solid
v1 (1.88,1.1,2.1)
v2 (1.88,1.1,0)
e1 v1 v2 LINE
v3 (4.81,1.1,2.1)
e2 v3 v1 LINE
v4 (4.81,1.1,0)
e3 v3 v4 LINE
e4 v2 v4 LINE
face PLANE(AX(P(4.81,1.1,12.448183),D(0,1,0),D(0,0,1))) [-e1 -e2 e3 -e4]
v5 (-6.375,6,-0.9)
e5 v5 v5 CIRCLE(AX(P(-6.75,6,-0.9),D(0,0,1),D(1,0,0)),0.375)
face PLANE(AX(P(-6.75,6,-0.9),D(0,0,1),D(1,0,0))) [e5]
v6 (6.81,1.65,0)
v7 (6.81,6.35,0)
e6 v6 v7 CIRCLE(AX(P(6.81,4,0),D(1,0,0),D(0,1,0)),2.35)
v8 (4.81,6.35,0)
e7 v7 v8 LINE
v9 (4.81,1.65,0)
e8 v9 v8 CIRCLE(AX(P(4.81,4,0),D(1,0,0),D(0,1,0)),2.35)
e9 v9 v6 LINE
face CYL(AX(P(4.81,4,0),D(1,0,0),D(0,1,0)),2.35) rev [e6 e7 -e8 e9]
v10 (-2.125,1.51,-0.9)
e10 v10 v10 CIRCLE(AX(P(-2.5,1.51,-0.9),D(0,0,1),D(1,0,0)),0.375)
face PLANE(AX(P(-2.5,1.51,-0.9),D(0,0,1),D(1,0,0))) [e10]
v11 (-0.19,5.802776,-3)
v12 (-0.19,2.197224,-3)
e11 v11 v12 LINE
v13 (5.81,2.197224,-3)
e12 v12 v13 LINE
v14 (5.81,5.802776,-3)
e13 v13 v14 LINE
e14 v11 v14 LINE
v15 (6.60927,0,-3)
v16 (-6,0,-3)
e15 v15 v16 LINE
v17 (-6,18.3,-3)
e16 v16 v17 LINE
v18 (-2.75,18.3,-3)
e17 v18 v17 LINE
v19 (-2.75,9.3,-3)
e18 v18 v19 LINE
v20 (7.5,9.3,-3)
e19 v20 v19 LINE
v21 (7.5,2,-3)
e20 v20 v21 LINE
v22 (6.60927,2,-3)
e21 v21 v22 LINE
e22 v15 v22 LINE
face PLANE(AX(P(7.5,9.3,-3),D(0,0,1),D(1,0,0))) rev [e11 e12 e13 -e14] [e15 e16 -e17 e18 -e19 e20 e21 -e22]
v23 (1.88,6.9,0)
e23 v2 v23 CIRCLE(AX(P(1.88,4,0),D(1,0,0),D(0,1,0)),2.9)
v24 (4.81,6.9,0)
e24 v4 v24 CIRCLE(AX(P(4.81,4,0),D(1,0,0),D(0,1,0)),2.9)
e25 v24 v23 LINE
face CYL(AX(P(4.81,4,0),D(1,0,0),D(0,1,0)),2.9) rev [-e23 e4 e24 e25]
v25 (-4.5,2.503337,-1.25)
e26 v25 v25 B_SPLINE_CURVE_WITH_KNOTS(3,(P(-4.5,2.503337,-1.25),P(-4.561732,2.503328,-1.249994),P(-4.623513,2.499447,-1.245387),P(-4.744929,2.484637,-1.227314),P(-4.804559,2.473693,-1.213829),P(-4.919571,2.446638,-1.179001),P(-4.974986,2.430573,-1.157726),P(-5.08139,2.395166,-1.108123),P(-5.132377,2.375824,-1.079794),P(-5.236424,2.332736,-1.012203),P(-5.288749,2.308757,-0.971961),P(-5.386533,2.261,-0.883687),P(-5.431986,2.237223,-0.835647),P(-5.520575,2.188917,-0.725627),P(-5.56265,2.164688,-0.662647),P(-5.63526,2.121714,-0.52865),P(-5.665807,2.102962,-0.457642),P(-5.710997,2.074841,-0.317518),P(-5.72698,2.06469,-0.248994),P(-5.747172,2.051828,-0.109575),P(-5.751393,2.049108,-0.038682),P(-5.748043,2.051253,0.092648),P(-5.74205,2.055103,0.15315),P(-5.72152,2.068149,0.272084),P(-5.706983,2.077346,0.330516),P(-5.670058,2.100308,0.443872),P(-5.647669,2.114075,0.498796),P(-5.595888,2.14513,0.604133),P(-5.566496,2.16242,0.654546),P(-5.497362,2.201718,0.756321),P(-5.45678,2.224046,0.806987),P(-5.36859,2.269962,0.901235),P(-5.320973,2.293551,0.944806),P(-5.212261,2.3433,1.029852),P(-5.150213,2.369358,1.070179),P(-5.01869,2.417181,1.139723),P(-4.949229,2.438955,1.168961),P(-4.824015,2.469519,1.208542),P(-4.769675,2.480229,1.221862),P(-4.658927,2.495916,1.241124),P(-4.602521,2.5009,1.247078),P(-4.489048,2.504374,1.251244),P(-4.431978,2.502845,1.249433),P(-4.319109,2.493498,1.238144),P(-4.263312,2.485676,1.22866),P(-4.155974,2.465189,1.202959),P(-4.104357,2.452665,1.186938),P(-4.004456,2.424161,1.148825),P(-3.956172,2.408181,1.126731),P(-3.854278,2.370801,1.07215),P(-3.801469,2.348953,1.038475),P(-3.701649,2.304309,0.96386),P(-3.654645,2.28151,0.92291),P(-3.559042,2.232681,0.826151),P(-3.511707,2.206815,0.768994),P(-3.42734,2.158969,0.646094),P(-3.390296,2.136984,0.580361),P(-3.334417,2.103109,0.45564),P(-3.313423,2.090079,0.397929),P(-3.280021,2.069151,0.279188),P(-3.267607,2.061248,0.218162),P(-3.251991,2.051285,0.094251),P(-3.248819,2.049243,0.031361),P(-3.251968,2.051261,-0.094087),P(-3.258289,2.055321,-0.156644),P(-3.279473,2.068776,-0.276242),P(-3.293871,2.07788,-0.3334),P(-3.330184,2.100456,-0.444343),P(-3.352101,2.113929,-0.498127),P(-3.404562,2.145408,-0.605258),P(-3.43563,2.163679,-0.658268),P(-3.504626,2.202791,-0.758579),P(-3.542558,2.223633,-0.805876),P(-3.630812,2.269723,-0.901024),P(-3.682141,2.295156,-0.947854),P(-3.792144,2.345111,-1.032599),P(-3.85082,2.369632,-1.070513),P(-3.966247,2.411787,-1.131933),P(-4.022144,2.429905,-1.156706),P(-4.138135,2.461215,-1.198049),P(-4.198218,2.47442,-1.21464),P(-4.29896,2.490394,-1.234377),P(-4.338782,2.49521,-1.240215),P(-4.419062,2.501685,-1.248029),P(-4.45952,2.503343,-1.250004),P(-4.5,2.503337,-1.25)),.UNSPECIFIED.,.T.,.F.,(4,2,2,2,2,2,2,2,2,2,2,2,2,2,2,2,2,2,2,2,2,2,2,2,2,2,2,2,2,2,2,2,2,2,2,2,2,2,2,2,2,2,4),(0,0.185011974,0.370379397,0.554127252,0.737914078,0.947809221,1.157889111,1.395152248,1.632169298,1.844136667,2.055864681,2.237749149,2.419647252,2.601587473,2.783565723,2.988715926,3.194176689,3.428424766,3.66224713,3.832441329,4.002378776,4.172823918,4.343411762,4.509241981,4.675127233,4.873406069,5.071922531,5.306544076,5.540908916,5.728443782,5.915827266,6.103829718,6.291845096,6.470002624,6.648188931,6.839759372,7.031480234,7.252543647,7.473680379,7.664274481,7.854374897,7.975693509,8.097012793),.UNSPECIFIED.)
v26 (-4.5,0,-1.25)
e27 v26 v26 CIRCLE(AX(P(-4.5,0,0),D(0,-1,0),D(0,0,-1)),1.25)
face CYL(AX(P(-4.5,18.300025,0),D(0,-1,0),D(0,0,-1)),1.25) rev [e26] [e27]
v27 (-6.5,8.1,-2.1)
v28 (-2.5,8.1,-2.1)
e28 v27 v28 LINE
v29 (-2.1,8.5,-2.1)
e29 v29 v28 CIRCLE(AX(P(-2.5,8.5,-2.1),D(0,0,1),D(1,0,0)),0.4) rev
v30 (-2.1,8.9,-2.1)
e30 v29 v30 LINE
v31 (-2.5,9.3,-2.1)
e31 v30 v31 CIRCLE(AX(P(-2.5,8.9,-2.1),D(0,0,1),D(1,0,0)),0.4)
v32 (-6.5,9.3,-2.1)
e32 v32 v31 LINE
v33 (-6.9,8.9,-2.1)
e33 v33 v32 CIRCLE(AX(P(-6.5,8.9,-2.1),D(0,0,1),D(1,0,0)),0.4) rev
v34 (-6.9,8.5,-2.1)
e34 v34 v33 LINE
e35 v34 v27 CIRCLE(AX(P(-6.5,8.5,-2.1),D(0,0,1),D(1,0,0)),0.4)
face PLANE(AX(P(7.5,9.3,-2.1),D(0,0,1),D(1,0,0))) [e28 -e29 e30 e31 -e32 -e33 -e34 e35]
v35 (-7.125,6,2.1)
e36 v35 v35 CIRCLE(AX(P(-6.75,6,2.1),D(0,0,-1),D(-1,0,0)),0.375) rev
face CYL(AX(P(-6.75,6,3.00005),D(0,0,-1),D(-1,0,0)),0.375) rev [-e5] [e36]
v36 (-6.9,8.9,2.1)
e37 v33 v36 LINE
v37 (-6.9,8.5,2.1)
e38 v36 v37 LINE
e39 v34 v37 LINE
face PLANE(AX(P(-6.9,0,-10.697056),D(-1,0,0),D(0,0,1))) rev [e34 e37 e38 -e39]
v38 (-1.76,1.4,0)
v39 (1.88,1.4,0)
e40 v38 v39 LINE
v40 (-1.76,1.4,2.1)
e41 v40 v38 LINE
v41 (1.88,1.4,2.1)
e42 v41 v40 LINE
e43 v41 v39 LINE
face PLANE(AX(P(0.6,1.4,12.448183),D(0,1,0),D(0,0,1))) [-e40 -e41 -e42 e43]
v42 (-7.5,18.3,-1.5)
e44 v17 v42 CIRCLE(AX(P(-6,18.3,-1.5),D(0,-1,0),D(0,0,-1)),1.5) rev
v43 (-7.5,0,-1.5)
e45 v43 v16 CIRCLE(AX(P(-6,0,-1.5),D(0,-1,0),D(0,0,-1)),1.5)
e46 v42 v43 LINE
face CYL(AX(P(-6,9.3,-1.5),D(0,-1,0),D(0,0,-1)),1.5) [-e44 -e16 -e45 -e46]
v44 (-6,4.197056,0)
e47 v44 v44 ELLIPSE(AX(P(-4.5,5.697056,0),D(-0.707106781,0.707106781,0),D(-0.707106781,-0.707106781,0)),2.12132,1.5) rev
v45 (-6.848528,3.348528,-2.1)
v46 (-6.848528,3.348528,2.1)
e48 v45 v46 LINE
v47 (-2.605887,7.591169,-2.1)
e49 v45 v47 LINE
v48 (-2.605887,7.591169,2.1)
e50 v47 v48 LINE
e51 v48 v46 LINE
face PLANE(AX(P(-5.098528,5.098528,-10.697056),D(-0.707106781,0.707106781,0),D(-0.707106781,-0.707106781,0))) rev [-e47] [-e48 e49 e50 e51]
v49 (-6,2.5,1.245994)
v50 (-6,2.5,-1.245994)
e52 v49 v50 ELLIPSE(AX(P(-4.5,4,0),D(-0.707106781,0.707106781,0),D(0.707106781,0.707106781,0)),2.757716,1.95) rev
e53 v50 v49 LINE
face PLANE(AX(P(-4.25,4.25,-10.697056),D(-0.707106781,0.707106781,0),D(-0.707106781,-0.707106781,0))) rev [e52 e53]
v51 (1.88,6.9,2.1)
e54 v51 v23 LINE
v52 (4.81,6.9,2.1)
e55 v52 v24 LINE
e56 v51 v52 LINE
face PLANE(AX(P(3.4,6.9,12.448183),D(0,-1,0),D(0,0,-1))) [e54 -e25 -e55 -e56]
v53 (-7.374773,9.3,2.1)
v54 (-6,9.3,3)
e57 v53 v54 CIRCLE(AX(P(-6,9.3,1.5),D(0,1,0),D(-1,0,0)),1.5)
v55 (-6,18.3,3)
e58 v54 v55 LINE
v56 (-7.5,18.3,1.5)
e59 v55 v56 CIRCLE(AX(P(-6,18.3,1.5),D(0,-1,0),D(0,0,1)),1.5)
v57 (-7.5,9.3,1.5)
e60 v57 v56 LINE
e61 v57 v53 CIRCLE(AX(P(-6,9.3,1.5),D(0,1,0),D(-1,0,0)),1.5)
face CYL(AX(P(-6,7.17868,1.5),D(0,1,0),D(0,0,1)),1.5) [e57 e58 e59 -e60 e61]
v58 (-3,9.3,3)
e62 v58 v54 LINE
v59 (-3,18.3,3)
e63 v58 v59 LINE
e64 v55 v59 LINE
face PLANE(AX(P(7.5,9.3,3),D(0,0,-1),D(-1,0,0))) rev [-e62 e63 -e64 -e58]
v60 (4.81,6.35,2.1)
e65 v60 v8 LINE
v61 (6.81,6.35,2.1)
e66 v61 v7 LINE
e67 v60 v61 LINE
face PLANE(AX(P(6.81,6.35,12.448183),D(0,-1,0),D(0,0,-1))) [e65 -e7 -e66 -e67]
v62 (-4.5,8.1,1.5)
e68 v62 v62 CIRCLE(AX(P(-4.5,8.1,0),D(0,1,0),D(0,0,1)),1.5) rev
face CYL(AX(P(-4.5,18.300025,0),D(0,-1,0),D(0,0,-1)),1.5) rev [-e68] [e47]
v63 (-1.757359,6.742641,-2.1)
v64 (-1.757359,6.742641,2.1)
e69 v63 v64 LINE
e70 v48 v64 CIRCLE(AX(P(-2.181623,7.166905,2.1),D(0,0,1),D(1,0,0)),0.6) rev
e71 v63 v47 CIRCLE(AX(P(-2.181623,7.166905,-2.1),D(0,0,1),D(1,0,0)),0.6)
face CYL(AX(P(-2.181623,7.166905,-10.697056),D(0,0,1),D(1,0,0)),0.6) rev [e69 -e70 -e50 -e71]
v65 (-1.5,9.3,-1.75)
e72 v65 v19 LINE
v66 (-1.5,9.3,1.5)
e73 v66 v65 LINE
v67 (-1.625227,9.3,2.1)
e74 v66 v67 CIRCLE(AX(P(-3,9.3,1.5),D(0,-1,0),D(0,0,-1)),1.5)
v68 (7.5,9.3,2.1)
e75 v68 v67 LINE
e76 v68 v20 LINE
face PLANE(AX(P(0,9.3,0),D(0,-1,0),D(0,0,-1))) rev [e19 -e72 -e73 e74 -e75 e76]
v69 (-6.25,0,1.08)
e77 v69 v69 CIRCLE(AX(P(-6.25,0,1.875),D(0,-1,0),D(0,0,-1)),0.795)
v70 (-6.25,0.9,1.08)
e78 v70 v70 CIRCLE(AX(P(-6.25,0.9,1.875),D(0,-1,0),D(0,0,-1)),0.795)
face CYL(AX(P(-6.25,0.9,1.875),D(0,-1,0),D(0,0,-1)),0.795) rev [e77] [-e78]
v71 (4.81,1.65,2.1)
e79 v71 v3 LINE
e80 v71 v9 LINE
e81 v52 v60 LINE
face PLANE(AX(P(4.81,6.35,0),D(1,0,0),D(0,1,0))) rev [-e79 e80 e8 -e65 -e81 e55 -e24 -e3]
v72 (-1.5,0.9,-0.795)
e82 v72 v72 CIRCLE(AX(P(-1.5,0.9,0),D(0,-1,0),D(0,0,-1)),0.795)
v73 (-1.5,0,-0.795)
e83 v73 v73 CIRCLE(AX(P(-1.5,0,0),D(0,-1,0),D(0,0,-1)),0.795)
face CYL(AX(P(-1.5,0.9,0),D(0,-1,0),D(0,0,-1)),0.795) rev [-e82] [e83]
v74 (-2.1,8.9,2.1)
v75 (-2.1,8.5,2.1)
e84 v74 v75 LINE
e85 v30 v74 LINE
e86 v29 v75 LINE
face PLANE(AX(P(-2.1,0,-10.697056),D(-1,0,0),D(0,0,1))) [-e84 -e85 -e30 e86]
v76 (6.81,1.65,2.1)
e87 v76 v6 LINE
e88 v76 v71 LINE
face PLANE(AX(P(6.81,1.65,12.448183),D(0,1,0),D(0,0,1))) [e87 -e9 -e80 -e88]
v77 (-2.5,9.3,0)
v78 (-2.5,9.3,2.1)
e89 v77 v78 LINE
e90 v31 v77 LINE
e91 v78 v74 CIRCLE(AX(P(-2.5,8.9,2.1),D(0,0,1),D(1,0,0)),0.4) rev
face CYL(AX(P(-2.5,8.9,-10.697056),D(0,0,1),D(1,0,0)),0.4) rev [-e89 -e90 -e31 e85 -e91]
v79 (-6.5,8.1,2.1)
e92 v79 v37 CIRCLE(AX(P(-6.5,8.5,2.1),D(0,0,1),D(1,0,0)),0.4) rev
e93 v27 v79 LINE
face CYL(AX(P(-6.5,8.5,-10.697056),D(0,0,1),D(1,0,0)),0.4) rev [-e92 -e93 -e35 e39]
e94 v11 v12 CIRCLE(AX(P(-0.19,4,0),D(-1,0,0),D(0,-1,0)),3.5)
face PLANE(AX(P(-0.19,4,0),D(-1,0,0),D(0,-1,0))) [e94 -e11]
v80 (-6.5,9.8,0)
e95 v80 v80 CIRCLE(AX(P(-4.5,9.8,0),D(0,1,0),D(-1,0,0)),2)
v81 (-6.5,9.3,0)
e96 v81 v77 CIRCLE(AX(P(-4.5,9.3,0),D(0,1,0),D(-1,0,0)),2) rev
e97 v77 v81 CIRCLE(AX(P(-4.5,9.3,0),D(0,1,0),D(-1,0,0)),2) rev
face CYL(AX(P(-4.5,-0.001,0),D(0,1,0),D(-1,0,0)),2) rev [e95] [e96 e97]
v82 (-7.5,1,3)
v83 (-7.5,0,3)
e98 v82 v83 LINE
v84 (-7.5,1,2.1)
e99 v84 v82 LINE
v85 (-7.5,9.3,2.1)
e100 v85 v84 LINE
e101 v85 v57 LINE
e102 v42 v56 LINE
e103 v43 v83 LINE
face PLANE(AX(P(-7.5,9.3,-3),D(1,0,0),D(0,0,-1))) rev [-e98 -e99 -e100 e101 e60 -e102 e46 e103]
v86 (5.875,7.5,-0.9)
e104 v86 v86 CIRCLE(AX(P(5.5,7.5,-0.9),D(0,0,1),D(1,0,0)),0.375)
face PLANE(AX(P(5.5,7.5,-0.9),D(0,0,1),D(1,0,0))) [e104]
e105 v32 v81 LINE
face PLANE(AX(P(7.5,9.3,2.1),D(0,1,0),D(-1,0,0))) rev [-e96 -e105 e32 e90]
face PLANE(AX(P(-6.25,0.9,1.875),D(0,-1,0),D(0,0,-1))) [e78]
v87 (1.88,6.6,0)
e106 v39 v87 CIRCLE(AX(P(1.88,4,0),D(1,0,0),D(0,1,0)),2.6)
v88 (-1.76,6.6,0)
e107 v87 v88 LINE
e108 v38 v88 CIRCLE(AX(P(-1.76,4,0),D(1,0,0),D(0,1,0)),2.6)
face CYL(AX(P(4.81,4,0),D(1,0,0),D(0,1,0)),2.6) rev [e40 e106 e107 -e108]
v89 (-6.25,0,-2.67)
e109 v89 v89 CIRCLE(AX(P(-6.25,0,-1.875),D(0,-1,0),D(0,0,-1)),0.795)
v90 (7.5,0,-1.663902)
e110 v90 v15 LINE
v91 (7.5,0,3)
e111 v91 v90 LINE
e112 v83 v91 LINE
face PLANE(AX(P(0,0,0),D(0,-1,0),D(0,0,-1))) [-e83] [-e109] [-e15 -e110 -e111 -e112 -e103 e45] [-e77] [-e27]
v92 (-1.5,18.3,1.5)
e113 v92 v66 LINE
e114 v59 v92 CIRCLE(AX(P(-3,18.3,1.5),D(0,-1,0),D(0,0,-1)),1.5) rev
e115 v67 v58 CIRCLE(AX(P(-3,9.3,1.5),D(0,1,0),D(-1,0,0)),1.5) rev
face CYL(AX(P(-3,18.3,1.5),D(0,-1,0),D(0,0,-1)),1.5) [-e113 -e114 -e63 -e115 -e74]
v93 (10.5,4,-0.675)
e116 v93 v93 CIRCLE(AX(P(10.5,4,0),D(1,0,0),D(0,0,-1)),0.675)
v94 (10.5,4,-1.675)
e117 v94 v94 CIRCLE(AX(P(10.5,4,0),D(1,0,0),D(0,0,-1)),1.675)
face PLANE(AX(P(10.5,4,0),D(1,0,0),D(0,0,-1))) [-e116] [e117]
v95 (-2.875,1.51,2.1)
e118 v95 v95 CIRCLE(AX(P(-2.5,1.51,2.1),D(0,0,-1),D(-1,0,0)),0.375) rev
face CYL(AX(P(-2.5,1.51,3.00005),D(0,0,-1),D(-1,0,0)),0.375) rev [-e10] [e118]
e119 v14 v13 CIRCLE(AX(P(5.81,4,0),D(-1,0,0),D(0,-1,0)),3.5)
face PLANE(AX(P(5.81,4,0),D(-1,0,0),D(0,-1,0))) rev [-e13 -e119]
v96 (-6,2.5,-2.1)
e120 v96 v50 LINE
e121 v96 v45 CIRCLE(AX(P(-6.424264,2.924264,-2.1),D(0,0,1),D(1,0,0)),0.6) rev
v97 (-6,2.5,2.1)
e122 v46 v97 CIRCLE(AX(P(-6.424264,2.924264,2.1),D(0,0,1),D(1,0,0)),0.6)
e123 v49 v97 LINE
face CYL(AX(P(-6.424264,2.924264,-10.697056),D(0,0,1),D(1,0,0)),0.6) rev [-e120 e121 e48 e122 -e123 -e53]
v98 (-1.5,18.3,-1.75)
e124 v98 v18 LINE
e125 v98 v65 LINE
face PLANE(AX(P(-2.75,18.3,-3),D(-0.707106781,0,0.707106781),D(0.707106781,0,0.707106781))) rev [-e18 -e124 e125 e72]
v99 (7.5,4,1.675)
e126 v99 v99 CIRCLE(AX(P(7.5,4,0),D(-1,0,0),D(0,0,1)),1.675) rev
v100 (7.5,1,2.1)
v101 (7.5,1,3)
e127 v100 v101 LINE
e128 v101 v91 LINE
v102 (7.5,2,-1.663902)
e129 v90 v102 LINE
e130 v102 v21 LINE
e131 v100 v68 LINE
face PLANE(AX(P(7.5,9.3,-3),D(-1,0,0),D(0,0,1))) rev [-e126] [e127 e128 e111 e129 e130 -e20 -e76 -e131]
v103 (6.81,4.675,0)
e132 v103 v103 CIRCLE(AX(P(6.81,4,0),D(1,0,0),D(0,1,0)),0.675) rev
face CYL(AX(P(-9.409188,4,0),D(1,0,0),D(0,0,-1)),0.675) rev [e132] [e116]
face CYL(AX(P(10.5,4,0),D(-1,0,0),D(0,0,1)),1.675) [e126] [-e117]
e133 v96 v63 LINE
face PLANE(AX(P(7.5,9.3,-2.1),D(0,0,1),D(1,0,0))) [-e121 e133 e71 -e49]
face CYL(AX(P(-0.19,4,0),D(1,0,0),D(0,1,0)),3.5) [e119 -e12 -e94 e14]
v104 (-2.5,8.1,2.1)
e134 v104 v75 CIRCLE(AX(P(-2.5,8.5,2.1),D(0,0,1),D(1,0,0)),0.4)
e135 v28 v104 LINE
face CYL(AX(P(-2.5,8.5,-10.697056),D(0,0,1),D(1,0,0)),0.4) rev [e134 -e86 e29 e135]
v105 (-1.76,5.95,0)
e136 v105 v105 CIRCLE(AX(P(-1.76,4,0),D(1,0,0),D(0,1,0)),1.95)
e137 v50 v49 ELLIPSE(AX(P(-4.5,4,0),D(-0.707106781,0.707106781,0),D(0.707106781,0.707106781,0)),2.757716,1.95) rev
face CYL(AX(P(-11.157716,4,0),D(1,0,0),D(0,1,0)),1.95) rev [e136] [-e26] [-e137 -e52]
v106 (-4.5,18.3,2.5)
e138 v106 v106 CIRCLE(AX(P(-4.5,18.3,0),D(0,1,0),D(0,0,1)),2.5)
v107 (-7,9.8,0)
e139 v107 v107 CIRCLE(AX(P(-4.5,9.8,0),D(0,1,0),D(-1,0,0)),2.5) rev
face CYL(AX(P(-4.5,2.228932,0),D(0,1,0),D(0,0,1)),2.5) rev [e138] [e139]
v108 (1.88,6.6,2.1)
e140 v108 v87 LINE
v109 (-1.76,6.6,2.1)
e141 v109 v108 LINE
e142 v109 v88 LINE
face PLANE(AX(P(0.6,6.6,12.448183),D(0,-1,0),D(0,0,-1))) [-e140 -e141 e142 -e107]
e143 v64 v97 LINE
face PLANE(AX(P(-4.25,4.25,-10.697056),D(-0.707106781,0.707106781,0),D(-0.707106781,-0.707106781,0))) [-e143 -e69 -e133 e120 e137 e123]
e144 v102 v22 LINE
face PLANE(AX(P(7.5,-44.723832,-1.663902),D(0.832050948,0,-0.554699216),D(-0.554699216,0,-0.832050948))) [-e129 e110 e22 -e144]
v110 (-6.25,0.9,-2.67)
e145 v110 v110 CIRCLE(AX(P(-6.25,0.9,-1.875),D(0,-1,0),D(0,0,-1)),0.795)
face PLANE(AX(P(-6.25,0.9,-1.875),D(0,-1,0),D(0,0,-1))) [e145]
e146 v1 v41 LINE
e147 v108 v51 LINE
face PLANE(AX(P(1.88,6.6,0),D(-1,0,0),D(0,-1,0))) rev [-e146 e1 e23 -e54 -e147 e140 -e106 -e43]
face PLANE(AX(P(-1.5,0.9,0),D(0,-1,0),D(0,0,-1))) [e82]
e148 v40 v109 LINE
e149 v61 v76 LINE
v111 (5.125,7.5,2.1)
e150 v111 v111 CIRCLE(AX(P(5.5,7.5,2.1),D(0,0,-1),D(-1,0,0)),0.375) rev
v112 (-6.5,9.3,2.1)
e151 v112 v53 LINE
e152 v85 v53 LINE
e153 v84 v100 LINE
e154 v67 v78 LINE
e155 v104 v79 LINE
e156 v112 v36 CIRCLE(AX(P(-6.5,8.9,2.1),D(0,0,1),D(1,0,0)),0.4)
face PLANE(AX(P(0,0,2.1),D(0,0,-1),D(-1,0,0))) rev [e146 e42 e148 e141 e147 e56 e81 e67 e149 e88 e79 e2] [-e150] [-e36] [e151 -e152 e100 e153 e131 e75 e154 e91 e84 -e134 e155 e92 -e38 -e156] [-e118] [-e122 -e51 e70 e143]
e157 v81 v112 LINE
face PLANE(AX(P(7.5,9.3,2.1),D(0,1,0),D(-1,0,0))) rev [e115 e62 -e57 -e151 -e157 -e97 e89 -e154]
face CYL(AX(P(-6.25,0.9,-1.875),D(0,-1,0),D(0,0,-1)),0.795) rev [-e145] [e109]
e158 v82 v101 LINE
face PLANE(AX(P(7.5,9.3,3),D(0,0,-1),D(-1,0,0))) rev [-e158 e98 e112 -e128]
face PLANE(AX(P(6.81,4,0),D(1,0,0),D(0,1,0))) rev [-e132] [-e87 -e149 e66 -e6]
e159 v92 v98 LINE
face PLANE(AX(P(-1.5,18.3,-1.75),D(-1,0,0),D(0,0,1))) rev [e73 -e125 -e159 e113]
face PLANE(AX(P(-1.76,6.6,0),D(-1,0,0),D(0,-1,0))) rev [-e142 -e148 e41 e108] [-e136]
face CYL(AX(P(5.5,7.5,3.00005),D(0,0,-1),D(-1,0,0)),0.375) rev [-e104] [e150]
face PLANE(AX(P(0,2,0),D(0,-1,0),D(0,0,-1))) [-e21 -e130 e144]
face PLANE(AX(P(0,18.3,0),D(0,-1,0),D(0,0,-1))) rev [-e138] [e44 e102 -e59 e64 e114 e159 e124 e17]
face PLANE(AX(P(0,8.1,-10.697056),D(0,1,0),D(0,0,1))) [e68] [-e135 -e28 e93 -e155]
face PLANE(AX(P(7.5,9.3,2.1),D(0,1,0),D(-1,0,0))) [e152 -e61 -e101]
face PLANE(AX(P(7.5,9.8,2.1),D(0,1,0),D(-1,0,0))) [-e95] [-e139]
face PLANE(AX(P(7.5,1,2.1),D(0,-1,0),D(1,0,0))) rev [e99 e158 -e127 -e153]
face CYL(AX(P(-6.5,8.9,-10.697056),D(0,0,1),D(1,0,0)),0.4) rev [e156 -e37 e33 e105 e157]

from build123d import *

# Parameters (mm, degrees)
SKETCH1_W                       = 15
SKETCH1_H                       = 6
MAIN_BODY_EXT_DEPTH             = 9.3
EMISSION_PATH_EXT_DEPTH         = 9
SKETCH3_R                       = 1.25
EMISSION_AND_GRIN_CUT_DEPTH     = 21.003499694
FIBER_FERRULE_CUT_REACH         = 25.851
FIBER_FERRULE_CUT_END_RADIUS    = 1.25
SKETCH4_R                       = 0.675
FIBER_START                     = 3
SKETCH41_R                      = 1.675
SKETCH41_R_2                    = 0.675
FIBER_FERRULE_PORT_EXT_DEPTH    = 3
SKETCH5_W                       = 15
SKETCH5_H                       = 8.3
FILTERSET_CUT1_DEPTH            = 0.9
FILTERSET_CUT2_DEPTH            = 4.2
SKETCH10_R                      = 2.5
EMISSION_LENS_CUT_DEPTH         = 8.5
EXCITATION_PATHWAY_CUT_REACH    = 24.231
SKETCH40_R                      = 1.95
EXCITATION_PATHWAY_CUT_2_DEPTH  = 2.1
SKETCH15_R                      = 0.795
MAGNETS_CUT_DEPTH               = 0.9
SCREW_HOLES_CUT_DEPTH           = 22.705989957
SCREW_HOLES_CUT_DEPTH_BACK      = 3
SKETCH18_R                      = 0.375
EXTERNAL_FILLET_1_R             = 1.5
EMISSION_PATHWAY_CUT_DEPTH      = 15.942891286
EMISSION_PATHWAY_CUT_DEPTH_BACK = 4
SKETCH28_R                      = 1.5
CUT_EXTRUDE16_DEPTH             = 9
CUT_EXTRUDE17_REACH             = 16.673
SKETCH37_R                      = 2
LENS_WALL_THICKNESS_EXT_DEPTH   = 6
BASEPLATE_NOTCH_CUT_DEPTH       = 22.386678096
BASEPLATE_NOTCH_CUT_DEPTH_BACK  = 2


with BuildPart() as part:
    # Sketch1 → Main Body Ext (new body)
    with BuildSketch(Plane(origin=(0, 0, 0), x_dir=(1, 0, 0), z_dir=(0, 1, 0))):
        Rectangle(SKETCH1_W, SKETCH1_H)
    extrude(amount=MAIN_BODY_EXT_DEPTH)

    # Sketch8 → Emission Path Ext (add)
    with BuildSketch(Plane(origin=(0, 9.3, 0), x_dir=(1, 0, 0), z_dir=(0, 1, 0))):
        Polygon((-2.75, 3), (-1.5, 1.75), (-1.5, -3), (-7.5, -3), (-7.5, 3), align=None)
    extrude(amount=EMISSION_PATH_EXT_DEPTH)

    # Sketch3 → Emission and Grin Cut (cut, through all)
    with BuildSketch(Plane.XZ):
        with Locations(Location((-4.5, 0, 0), (0, 0, 270))):
            Circle(SKETCH3_R)
    extrude(amount=-EMISSION_AND_GRIN_CUT_DEPTH, mode=Mode.SUBTRACT)

    # Fiber Ferrule Cut: up to this cylinder (the profile starts outside it)
    fiber_ferrule_cut_end = Plane(origin=(-4.5, 4, 0), z_dir=(0, -1, 0)) * Cylinder(FIBER_FERRULE_CUT_END_RADIUS, 55.202, mode=Mode.PRIVATE)
    # Sketch4 → Fiber Ferrule Cut (cut, up to the surface)
    with BuildSketch(Plane(origin=(7.5, 0, 0), x_dir=(0, 0, -1), z_dir=(1, 0, 0)), mode=Mode.PRIVATE) as fiber_ferrule_cut_sk1:
        with Locations((0, 4)):
            Circle(SKETCH4_R)
    fiber_ferrule_cut_tool1 = extrude(fiber_ferrule_cut_sk1.sketch, amount=-FIBER_FERRULE_CUT_REACH, mode=Mode.PRIVATE) - fiber_ferrule_cut_end
    add(fiber_ferrule_cut_tool1.solids().sort_by_distance((7.5, 4, 0))[0], mode=Mode.SUBTRACT)

    # Sketch41 → Fiber Ferrule Port Ext (add)
    with BuildSketch(Plane(origin=(7.5, 0, 0), x_dir=(0, 0, -1), z_dir=(1, 0, 0)).offset(FIBER_START)):
        with Locations(Location((0, 4, 0), (0, 0, 180))):
            Circle(SKETCH41_R)
        with Locations((0, 4)):
            Circle(SKETCH41_R_2, mode=Mode.SUBTRACT)
    extrude(amount=-FIBER_FERRULE_PORT_EXT_DEPTH)

    # Sketch5 → FilterSet Cut1 (cut)
    with BuildSketch(Plane.XY.offset(3)):
        with Locations((0, 5.15)):
            Rectangle(SKETCH5_W, SKETCH5_H)
    extrude(amount=-FILTERSET_CUT1_DEPTH, mode=Mode.SUBTRACT)

    # Sketch6 → FilterSet Cut2 (cut)
    with BuildSketch(Plane.XY.offset(2.1)):
        with BuildLine():
            Line((-2.60588745, 7.591168825), (-6.848528137, 3.348528137))
            ThreePointArc((-6.848528137, 3.348528137), (-6.848528137, 2.5), (-6, 2.5))
            Line((-6, 2.5), (-1.757359313, 6.742640687))
            ThreePointArc((-1.757359313, 6.742640687), (-1.757359313, 7.591168825), (-2.60588745, 7.591168825))
        make_face()
        with BuildLine():
            ThreePointArc((-6.5, 9.3), (-6.782842712, 9.182842712), (-6.9, 8.9))
            Line((-6.9, 8.9), (-6.9, 8.5))
            ThreePointArc((-6.9, 8.5), (-6.782842712, 8.217157288), (-6.5, 8.1))
            Line((-6.5, 8.1), (-2.5, 8.1))
            ThreePointArc((-2.5, 8.1), (-2.217157288, 8.217157288), (-2.1, 8.5))
            Line((-2.1, 8.5), (-2.1, 8.9))
            ThreePointArc((-2.1, 8.9), (-2.217157288, 9.182842712), (-2.5, 9.3))
            Line((-2.5, 9.3), (-6.5, 9.3))
        make_face()
    extrude(amount=-FILTERSET_CUT2_DEPTH, mode=Mode.SUBTRACT)

    # Sketch39 → Excitation Lens Cut (revolve, cut)
    with BuildSketch(Plane.XY, mode=Mode.PRIVATE) as excitation_lens_cut_sk:
        Polygon((0.6, 6.6), (1.88, 6.6), (1.88, 6.9), (3.4, 6.9), (4.81, 6.9), (4.81, 6.35), (6.81, 6.35), (6.81, 4), (4.81, 4), (3.4, 4), (-0.405829172, 4), (-0.9, 4), (-1.76, 4), (-1.76, 6.6), (-0.9, 6.6), align=None)
    revolve(excitation_lens_cut_sk.sketch.rotate(Axis((4.81, 4, 0), (-1, 0, 0)), 90), axis=Axis((4.81, 4, 0), (-1, 0, 0)), mode=Mode.SUBTRACT)

    # Sketch10 → Emission Lens Cut (cut)
    with BuildSketch(Plane(origin=(0, 18.3, 0), x_dir=(1, 0, 0), z_dir=(0, 1, 0))):
        with Locations(Location((-4.5, 0, 0), (0, 0, 270))):
            Circle(SKETCH10_R)
    extrude(amount=-EMISSION_LENS_CUT_DEPTH, mode=Mode.SUBTRACT)

    # Excitation Pathway Cut: up to this plane
    excitation_pathway_cut_end = Plane(origin=(-4.25, 4.25, -10.697056275), z_dir=(-0.7071067811865425, 0.7071067811865526, 0))
    # Sketch40 → Excitation Pathway Cut (cut, up to the surface)
    with BuildSketch(Plane(origin=(-1.76, 0, 0), x_dir=(0, 0, -1), z_dir=(1, 0, 0)), mode=Mode.PRIVATE) as excitation_pathway_cut_sk1:
        with Locations(Location((0, 4, 0), (0, 0, 90))):
            Circle(SKETCH40_R)
    excitation_pathway_cut_tool1 = split(extrude(excitation_pathway_cut_sk1.sketch, amount=-EXCITATION_PATHWAY_CUT_REACH, mode=Mode.PRIVATE), bisect_by=excitation_pathway_cut_end, keep=Keep.BOTH, mode=Mode.PRIVATE)
    add(excitation_pathway_cut_tool1.solids().sort_by_distance((-1.76, 4, 0))[0], mode=Mode.SUBTRACT)

    # Sketch44 → Excitation Pathway Cut 2 (cut)
    with BuildSketch(Plane.XY):
        Polygon((3.4, 1.1), (1.88, 1.1), (1.88, 1.4), (0.6, 1.4), (-0.9, 1.4), (-1.76, 1.4), (-1.76, 6.6), (-0.9, 6.6), (0.6, 6.6), (1.88, 6.6), (1.88, 6.9), (3.4, 6.9), (4.81, 6.9), (4.81, 6.35), (6.81, 6.35), (6.81, 1.65), (4.81, 1.65), (4.81, 1.1), align=None)
    extrude(amount=EXCITATION_PATHWAY_CUT_2_DEPTH, mode=Mode.SUBTRACT)

    # Sketch15 → Magnets Cut (cut)
    with BuildSketch(Plane.XZ):
        with Locations(Location((-6.25, -1.875, 0), (0, 0, 270))):
            Circle(SKETCH15_R)
        with Locations(Location((-6.25, 1.875, 0), (0, 0, 270))):
            Circle(SKETCH15_R)
        with Locations(Location((-1.5, 0, 0), (0, 0, 270))):
            Circle(SKETCH15_R)
    extrude(amount=-MAGNETS_CUT_DEPTH, mode=Mode.SUBTRACT)

    # Sketch18 → Screw Holes Cut (cut, two sides: drawn at the far end of the back side and taken through both)
    with BuildSketch(Plane.XY.offset(2.1).offset(-SCREW_HOLES_CUT_DEPTH_BACK)):
        with Locations(Location((-6.75, 6, 0), (0, 0, 180))):
            Circle(SKETCH18_R)
        with Locations(Location((5.5, 7.5, 0), (0, 0, 180))):
            Circle(SKETCH18_R)
        with Locations(Location((-2.5, 1.51, 0), (0, 0, 180))):
            Circle(SKETCH18_R)
    extrude(amount=SCREW_HOLES_CUT_DEPTH + SCREW_HOLES_CUT_DEPTH_BACK, mode=Mode.SUBTRACT)

    # External Fillet 1
    # the kernel refuses this fillet: 1.5 mm, written as the material it takes off along each edge
    with BuildSketch(Plane(origin=(-7.5, -3.75, -3), x_dir=(1, 0, 0), z_dir=(0, 1, 0))) as external_fillet_1_piece_1:
        with BuildLine():
            CenterArc((EXTERNAL_FILLET_1_R, -EXTERNAL_FILLET_1_R), EXTERNAL_FILLET_1_R, 90, 90)
            Line((0, -EXTERNAL_FILLET_1_R), (0, 0))
            Line((0, 0), (EXTERNAL_FILLET_1_R, 0))
        make_face()
    extrude(amount=25.8, mode=Mode.SUBTRACT)
    with BuildSketch(Plane(origin=(-1.5, 9.3, 3), x_dir=(0, 0, -1), z_dir=(0, 1, 0))) as external_fillet_1_piece_2:
        with BuildLine():
            CenterArc((EXTERNAL_FILLET_1_R, EXTERNAL_FILLET_1_R), EXTERNAL_FILLET_1_R, 180, 90)
            Line((0, EXTERNAL_FILLET_1_R), (0, 0))
            Line((0, 0), (EXTERNAL_FILLET_1_R, 0))
        make_face()
    extrude(amount=12.75, mode=Mode.SUBTRACT)

    # Sketch28 → Emission Pathway Cut (cut, two sides: drawn at the far end of the back side and taken through both)
    with BuildSketch(Plane(origin=(0, 8.1, 0), x_dir=(1, 0, 0), z_dir=(0, 1, 0)).offset(-EMISSION_PATHWAY_CUT_DEPTH_BACK)):
        with Locations(Location((-4.5, 0, 0), (0, 0, 180))):
            Circle(SKETCH28_R)
    extrude(amount=EMISSION_PATHWAY_CUT_DEPTH + EMISSION_PATHWAY_CUT_DEPTH_BACK, mode=Mode.SUBTRACT)

    # Sketch36 → Cut-Extrude16 (cut)
    with BuildSketch(Plane(origin=(0, 18.3, 0), x_dir=(1, 0, 0), z_dir=(0, 1, 0))):
        with BuildLine():
            Line((-7.5, -1.5), (-7.5, -3))
            Line((-7.5, -3), (-6, -3))
            ThreePointArc((-6, -3), (-7.060660172, -2.560660172), (-7.5, -1.5))
        make_face()
    extrude(amount=-CUT_EXTRUDE16_DEPTH, mode=Mode.SUBTRACT)

    # Sketch37 → Cut-Extrude17 (cut, up to next)
    with BuildSketch(Plane(origin=(0, 9.8, 0), x_dir=(1, 0, 0), z_dir=(0, 1, 0)), mode=Mode.PRIVATE) as cut_extrude17_sk1:
        with Locations(Location((-4.5, 0, 0), (0, 0, 180))):
            Circle(SKETCH37_R)
    cut_extrude17_tool1 = extrude(cut_extrude17_sk1.sketch, amount=-CUT_EXTRUDE17_REACH, mode=Mode.PRIVATE) & part.part
    add(cut_extrude17_tool1.solids().sort_by_distance((-4.5, 9.8, 0))[0], mode=Mode.SUBTRACT)

    # Sketch43 → Lens Wall Thickness Ext (add)
    with BuildSketch(Plane.ZY.offset(-5.81)):
        with BuildLine():
            Line((-3, 2.75), (-3, 5.25))
            Line((-3, 5.25), (-3, 5.802775638))
            ThreePointArc((-3, 5.802775638), (-3.5, 4), (-3, 2.197224362))
            Line((-3, 2.197224362), (-3, 2.75))
        make_face()
    extrude(amount=LENS_WALL_THICKNESS_EXT_DEPTH)

    # Sketch45 → Baseplate Notch Cut (cut, two sides: drawn at the far end of the back side and taken through both)
    with BuildSketch(Plane.XZ.offset(-BASEPLATE_NOTCH_CUT_DEPTH_BACK)):
        Polygon((30.47380128, 32.796887648), (7.5, -1.663902268), (6.609270453, -3), (-16.364530827, -37.460789916), (52.557049005, -83.408392475), (99.395381111, -13.150714911), align=None)
    extrude(amount=BASEPLATE_NOTCH_CUT_DEPTH + BASEPLATE_NOTCH_CUT_DEPTH_BACK, mode=Mode.SUBTRACT)


solid = part.part
